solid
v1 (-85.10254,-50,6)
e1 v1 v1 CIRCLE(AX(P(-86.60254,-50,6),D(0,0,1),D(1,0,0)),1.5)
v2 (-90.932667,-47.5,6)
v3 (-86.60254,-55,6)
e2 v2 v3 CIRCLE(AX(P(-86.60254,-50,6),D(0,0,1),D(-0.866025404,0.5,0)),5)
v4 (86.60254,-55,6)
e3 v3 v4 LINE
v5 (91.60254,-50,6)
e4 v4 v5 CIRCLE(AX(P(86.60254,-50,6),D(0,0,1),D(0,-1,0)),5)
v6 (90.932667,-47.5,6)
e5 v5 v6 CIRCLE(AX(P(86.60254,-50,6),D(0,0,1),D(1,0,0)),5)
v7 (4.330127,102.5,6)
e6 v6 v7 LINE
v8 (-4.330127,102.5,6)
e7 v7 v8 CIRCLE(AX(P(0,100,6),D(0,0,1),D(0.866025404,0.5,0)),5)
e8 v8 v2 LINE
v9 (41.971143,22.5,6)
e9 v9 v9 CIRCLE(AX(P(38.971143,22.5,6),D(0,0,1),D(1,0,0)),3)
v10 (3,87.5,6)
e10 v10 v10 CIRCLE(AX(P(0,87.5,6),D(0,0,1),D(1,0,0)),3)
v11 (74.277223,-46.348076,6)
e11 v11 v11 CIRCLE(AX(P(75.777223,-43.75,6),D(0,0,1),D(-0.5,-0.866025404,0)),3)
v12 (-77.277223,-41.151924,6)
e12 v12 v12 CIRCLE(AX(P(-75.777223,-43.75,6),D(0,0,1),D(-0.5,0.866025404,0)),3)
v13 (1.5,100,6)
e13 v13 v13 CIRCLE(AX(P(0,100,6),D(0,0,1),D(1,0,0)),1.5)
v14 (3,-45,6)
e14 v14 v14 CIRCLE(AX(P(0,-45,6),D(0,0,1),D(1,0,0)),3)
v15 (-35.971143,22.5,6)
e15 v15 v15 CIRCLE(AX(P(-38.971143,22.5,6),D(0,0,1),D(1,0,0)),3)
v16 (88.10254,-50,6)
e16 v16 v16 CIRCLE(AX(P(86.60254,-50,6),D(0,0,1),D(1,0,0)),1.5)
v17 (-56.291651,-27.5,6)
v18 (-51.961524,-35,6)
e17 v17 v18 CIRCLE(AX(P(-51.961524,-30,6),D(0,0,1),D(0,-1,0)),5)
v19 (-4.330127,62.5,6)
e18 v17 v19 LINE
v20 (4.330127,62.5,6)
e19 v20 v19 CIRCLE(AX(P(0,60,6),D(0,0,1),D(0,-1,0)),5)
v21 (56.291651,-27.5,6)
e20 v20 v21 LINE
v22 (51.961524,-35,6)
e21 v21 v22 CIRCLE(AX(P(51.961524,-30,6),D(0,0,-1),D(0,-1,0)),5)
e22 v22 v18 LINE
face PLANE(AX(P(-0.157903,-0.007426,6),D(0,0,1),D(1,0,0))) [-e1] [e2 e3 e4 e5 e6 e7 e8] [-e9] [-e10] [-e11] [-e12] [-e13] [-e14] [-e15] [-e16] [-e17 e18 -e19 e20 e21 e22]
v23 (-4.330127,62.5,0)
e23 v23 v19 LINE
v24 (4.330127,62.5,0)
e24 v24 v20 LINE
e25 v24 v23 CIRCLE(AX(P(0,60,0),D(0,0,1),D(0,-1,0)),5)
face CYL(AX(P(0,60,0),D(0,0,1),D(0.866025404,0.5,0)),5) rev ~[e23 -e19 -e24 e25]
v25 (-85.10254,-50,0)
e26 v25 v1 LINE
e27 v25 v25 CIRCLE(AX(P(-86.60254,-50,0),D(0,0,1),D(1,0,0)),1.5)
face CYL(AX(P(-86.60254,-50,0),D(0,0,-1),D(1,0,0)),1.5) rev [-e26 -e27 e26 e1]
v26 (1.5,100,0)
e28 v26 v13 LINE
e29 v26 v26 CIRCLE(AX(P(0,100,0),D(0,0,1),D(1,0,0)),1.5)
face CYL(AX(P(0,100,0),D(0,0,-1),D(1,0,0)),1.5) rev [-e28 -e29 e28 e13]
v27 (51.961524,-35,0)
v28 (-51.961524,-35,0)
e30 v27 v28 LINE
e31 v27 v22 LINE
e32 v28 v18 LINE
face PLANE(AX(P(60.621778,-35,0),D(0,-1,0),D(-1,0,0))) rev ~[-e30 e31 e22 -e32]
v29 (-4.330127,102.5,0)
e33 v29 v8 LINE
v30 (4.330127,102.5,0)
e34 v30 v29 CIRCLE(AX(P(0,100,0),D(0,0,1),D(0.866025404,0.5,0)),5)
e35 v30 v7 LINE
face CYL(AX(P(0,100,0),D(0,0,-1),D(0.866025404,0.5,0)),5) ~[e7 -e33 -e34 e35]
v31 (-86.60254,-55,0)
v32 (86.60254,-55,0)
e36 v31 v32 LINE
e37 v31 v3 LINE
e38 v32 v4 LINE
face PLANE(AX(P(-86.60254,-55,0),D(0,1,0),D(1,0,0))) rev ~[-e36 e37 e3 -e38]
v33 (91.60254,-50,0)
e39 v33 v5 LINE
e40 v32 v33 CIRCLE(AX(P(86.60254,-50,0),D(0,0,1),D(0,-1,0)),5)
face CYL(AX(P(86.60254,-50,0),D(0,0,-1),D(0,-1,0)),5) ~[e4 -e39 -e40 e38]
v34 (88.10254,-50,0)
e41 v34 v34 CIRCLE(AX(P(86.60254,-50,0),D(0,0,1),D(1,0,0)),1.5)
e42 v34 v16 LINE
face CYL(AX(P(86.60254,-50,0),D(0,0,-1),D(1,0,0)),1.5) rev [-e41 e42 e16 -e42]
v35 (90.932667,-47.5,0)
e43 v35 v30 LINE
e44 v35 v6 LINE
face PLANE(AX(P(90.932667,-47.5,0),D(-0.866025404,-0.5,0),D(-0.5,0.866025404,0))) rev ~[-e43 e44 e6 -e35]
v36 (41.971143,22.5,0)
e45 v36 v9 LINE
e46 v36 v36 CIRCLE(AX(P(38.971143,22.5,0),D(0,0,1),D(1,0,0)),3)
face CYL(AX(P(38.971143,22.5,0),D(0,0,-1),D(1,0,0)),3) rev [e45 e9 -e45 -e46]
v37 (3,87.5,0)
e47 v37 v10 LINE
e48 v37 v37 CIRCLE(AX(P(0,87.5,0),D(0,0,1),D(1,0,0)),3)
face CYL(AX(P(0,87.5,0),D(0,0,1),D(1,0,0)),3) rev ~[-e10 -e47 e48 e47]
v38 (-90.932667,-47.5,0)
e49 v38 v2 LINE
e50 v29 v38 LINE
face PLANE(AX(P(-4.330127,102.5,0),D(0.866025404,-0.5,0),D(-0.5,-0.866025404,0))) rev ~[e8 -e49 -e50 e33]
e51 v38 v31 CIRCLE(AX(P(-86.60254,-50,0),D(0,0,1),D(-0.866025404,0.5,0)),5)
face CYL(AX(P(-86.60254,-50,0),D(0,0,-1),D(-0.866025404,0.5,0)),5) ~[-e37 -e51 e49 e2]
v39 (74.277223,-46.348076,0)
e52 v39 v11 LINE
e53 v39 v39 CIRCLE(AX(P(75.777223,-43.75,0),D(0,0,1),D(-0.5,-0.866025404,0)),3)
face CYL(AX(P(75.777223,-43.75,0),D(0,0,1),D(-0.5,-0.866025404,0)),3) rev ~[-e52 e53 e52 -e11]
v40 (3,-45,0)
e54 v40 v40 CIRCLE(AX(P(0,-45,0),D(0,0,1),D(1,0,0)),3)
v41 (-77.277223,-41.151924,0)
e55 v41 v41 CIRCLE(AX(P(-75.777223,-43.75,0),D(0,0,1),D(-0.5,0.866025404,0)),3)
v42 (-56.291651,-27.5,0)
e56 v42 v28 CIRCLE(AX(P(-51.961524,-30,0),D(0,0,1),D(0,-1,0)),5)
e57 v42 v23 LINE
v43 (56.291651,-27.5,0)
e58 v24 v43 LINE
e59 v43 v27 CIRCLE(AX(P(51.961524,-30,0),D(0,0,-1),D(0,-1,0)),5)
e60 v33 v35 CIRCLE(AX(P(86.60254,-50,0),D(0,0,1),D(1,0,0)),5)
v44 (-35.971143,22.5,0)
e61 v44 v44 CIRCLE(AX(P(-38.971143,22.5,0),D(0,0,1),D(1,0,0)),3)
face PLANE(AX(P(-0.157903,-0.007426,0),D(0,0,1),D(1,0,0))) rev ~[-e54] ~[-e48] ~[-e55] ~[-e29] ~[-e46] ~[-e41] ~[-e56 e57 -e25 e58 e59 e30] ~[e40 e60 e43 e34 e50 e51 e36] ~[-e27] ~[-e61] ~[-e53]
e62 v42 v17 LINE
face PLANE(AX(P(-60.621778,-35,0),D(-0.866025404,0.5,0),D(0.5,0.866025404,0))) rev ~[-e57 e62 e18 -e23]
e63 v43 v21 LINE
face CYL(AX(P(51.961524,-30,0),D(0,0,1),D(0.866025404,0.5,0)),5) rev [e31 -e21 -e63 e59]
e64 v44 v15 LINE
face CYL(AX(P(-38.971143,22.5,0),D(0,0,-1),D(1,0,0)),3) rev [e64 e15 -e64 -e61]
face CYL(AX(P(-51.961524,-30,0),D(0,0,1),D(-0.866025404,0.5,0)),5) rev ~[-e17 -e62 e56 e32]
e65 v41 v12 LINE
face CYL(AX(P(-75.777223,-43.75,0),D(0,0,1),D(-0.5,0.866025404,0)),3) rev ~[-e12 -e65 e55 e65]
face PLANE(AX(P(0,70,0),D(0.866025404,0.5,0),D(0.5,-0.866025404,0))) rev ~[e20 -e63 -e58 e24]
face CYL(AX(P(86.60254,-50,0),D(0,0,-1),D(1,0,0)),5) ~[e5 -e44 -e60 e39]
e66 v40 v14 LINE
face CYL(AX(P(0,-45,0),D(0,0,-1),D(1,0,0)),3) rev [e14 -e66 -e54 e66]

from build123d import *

# Parameters (mm, degrees)
F1_R            = 3
F1_R_2          = 1.5
F2_DEPTH        = 6
F3_R            = 5
F4_R            = 3
F5_DEPTH        = 12.5
F5_COPIES_COUNT = 3


# Not quite as in the source:
# - a pattern or mirror of a feature is missing from the dataset's text; its kind, count and spacing are read off the source's solid


with BuildPart() as f2:
    # F1 (on Top) → F2 (new body)
    with BuildSketch(Plane.XY):
        with BuildLine():
            ThreePointArc((4.3301270189, 102.5), (4.8296291314, 101.2940952255), (5, 100))
            ThreePointArc((5, 100), (-1.2940952255, 95.1703708686), (-4.3301270189, 102.5))
            Line((-4.3301270189, 102.5), (-90.9326673974, -47.5))
            ThreePointArc((-90.9326673974, -47.5), (-85.3084451529, -45.1703708686), (-81.6025403784, -50))
            ThreePointArc((-81.6025403784, -50), (-83.0670064725, -53.5355339059), (-86.6025403784, -55))
            Line((-86.6025403784, -55), (86.6025403784, -55))
            ThreePointArc((86.6025403784, -55), (82.2724133595, -47.5), (90.9326673974, -47.5))
            Line((90.9326673974, -47.5), (4.3301270189, 102.5))
        make_face()
        with Locations((-38.9711431703, 22.5)):
            Circle(F1_R, mode=Mode.SUBTRACT)
        with Locations((0, -45)):
            Circle(F1_R, mode=Mode.SUBTRACT)
        Polygon((60.6217782649, -35), (-60.6217782649, -35), (0, 70), align=None, mode=Mode.SUBTRACT)
        with Locations((38.9711431703, 22.5)):
            Circle(F1_R, mode=Mode.SUBTRACT)
        with BuildLine():
            ThreePointArc((91.6025403784, -50), (91.4321695099, -48.7059047745), (90.9326673974, -47.5))
            ThreePointArc((90.9326673974, -47.5), (82.2724133595, -47.5), (86.6025403784, -55))
            ThreePointArc((86.6025403784, -55), (90.1380742844, -53.5355339059), (91.6025403784, -50))
        make_face()
        with Locations((86.6025403784, -50)):
            Circle(F1_R_2, mode=Mode.SUBTRACT)
        with BuildLine():
            ThreePointArc((-81.6025403784, -50), (-85.3084451529, -45.1703708686), (-90.9326673974, -47.5))
            ThreePointArc((-90.9326673974, -47.5), (-90.9326673974, -52.5), (-86.6025403784, -55))
            ThreePointArc((-86.6025403784, -55), (-83.0670064725, -53.5355339059), (-81.6025403784, -50))
        make_face()
        with Locations((-86.6025403784, -50)):
            Circle(F1_R_2, mode=Mode.SUBTRACT)
        with BuildLine():
            ThreePointArc((-4.3301270189, 102.5), (-1.2940952255, 95.1703708686), (5, 100))
            ThreePointArc((5, 100), (4.8296291314, 101.2940952255), (4.3301270189, 102.5))
            ThreePointArc((4.3301270189, 102.5), (0, 105), (-4.3301270189, 102.5))
        make_face()
        with Locations((0, 100)):
            Circle(F1_R_2, mode=Mode.SUBTRACT)
    extrude(amount=F2_DEPTH)

    # F3
    f3_edges = [f2.edges().sort_by_distance(p)[0] for p in [
        (0, 70, 3),
        (-60.621778, -35, 3),
        (60.621778, -35, 3),
    ]]
    fillet(f3_edges, radius=F3_R)

    # F4 (on Top) → F5 (cut, symmetric)
    with BuildSketch(Plane.XY):
        with Locations((0, 87.5)):
            Circle(F4_R)
    f5 = extrude(amount=F5_DEPTH, both=True, mode=Mode.SUBTRACT)

    # F5_copies: F5 ×3 about axis
    f5_copies_axis = Axis((0, 0, 0), (0, 0, 1))
    for i in range(1, F5_COPIES_COUNT):
        add(f5.rotate(f5_copies_axis, i * 360 / F5_COPIES_COUNT), mode=Mode.SUBTRACT)


solid = f2.part
